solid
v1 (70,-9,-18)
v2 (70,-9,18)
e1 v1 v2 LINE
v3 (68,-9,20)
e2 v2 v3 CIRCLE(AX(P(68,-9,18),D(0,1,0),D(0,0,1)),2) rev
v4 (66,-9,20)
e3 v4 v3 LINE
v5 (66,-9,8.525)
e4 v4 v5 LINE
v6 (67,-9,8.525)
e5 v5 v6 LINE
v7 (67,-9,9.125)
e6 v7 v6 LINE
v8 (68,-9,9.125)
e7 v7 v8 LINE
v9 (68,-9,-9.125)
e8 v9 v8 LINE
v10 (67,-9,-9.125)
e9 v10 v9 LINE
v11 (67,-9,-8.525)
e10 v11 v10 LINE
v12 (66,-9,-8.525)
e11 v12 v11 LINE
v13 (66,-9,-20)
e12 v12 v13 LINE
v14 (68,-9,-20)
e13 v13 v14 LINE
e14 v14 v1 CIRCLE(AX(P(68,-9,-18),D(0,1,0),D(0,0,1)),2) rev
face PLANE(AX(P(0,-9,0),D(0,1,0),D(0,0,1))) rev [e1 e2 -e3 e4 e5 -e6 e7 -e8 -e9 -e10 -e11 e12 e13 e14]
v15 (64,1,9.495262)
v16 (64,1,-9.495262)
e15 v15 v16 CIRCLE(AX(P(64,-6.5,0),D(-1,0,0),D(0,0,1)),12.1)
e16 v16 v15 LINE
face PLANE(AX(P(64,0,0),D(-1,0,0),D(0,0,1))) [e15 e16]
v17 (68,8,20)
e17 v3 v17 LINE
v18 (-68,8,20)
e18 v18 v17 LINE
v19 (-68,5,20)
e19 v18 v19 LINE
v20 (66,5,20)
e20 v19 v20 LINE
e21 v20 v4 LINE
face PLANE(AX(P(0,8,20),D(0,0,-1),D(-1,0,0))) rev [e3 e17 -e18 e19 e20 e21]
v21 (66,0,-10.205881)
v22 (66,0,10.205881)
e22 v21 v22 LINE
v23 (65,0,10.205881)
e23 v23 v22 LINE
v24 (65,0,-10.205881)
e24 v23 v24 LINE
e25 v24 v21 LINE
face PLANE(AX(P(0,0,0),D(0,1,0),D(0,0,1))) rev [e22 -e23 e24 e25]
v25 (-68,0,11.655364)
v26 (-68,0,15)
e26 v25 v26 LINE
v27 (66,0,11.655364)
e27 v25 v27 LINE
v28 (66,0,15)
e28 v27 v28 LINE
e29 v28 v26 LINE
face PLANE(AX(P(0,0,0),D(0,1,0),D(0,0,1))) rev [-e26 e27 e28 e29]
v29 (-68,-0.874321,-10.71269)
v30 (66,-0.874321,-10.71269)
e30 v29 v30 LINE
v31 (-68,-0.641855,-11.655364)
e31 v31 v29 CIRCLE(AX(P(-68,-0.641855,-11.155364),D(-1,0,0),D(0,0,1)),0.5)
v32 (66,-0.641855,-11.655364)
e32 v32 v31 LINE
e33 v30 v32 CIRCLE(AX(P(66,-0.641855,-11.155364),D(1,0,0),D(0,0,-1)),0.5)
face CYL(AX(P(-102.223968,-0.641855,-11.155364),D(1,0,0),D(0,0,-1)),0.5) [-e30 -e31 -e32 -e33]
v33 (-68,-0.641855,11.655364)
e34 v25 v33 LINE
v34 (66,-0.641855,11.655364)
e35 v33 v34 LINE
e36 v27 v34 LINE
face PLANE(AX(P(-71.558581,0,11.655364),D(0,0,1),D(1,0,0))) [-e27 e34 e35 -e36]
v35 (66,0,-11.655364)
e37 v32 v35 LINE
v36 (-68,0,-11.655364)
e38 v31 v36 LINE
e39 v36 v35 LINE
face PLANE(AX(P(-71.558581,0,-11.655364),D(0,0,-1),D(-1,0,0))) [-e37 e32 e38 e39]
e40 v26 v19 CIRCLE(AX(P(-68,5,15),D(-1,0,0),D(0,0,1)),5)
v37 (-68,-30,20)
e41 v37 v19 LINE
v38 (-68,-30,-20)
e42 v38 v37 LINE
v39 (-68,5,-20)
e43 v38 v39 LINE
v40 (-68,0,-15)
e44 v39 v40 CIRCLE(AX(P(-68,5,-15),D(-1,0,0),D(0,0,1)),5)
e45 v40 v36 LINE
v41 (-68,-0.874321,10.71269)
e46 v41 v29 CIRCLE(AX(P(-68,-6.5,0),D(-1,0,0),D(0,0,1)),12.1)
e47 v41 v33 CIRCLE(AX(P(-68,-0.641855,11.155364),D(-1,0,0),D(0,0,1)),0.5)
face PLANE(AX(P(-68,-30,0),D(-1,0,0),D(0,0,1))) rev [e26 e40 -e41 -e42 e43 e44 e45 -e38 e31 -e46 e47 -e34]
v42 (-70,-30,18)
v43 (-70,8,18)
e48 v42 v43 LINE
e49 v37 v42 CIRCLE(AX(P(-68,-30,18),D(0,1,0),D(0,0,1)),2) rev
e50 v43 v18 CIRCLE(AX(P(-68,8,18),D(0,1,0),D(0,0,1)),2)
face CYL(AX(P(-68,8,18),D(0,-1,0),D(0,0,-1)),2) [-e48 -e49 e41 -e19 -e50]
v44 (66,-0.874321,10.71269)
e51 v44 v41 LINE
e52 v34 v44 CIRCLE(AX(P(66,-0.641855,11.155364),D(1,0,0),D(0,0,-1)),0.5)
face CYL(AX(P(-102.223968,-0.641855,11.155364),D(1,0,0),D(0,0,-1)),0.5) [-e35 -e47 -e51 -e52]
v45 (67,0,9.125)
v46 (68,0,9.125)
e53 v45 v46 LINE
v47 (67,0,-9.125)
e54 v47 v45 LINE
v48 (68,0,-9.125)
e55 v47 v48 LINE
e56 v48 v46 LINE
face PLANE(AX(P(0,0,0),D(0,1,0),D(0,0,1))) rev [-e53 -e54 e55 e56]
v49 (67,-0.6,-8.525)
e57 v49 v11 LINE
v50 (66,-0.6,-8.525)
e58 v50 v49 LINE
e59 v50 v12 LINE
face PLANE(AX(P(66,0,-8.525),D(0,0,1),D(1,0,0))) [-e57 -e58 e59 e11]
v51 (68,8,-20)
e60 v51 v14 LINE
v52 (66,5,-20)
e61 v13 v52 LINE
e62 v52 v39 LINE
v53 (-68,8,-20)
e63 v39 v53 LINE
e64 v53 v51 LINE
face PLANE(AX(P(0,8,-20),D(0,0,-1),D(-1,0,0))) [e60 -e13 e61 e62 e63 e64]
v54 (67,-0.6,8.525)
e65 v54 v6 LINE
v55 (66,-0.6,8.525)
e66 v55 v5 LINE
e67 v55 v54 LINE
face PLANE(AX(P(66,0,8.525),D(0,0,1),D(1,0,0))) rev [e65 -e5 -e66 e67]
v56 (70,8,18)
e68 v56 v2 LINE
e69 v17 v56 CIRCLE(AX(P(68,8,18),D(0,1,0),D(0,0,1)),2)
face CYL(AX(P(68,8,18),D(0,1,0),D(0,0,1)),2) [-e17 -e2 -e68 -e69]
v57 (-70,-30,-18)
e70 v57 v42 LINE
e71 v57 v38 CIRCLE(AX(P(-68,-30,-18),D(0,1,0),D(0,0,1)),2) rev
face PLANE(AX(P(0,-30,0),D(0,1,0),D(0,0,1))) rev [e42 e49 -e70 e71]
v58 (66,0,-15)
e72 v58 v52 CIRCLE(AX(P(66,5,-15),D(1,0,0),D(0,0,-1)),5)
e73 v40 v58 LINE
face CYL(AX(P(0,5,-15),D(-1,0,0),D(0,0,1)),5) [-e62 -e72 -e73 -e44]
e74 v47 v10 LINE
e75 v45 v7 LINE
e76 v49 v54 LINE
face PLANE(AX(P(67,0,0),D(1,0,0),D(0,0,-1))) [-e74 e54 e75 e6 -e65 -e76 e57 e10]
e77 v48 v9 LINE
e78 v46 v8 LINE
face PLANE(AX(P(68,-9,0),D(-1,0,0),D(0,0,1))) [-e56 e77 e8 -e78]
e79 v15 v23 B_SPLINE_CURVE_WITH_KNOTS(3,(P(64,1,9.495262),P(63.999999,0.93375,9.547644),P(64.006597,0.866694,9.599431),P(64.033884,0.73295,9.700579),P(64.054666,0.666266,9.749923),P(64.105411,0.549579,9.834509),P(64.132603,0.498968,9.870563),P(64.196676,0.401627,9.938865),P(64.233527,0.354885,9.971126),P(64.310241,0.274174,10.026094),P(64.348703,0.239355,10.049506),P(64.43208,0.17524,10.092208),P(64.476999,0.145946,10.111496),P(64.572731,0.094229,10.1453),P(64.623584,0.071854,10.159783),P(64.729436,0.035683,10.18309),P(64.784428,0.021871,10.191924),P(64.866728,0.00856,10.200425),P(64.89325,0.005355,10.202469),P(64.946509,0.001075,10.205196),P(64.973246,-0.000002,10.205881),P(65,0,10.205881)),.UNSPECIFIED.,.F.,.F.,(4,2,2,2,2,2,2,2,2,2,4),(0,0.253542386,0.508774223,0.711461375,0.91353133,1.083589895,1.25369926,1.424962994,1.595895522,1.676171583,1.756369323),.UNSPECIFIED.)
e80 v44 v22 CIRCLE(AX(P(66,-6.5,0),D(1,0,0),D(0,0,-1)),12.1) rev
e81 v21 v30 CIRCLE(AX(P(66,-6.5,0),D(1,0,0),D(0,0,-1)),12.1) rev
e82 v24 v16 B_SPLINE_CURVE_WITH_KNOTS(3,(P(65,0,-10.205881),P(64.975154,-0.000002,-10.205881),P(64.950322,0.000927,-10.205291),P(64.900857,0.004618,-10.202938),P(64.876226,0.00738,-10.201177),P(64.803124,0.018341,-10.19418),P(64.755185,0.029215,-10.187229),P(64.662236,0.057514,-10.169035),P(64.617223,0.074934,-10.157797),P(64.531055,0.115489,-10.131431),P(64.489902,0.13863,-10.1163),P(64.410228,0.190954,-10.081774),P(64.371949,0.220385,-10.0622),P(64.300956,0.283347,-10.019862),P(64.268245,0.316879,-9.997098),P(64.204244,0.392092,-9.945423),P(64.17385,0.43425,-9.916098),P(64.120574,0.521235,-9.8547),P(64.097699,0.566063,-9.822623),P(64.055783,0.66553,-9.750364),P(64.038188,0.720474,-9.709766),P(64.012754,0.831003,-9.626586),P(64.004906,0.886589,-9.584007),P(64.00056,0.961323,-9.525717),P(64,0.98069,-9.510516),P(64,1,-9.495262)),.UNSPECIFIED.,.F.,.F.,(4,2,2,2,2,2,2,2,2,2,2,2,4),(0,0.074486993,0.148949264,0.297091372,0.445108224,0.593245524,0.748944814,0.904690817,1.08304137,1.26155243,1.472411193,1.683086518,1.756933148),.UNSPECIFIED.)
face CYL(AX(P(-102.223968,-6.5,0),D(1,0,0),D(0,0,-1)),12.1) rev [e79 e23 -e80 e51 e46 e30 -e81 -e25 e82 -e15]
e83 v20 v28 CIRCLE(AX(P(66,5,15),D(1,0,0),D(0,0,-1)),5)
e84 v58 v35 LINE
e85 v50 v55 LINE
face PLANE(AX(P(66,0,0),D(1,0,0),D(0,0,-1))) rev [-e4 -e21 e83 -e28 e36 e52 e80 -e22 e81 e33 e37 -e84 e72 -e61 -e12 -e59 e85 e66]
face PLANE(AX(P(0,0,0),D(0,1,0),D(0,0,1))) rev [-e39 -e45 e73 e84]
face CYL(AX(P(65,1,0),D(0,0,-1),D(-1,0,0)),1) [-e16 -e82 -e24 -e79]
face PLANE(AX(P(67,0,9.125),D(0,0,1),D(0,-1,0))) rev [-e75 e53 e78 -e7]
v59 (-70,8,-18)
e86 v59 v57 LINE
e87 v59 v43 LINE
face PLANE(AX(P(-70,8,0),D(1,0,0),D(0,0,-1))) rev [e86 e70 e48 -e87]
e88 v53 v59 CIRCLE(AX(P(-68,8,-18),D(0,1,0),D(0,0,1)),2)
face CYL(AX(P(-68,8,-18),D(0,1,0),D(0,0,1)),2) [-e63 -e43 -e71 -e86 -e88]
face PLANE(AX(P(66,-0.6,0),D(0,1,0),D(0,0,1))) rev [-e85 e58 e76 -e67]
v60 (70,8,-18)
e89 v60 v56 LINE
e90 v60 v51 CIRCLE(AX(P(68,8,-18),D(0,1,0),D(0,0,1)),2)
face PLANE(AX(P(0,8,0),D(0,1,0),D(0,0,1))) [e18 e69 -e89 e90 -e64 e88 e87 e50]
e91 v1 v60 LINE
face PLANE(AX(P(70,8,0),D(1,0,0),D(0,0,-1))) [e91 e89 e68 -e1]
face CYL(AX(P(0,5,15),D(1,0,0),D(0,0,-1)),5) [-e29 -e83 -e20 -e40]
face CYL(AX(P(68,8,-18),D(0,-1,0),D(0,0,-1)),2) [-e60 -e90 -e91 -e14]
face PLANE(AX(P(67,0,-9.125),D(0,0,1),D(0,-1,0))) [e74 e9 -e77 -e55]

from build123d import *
from build123d.topology import SkipClean

# Parameters (mm, degrees)
SKETCH1_W           = 136
SKETCH1_H           = 40
SKETCH1_W_2         = 2
BOSS_EXTRUDE1_DEPTH = 8
SKETCH1_3_W         = 2
SKETCH1_3_H         = 40
BOSS_EXTRUDE2_DEPTH = 9
SKETCH2_W           = 10.875
SKETCH2_H           = 9
BOSS_EXTRUDE3_DEPTH = 1
BOSS_EXTRUDE4_START = 1
SKETCH2_3_W         = 10.875
SKETCH2_3_H         = 9
SKETCH2_3_W_2       = 17.05
SKETCH2_3_H_2       = 0.6
BOSS_EXTRUDE4_DEPTH = 1
SKETCH1_4_W         = 2
SKETCH1_4_H         = 40
BOSS_EXTRUDE5_DEPTH = 30
SKETCH3_R           = 12.1
CUT_EXTRUDE1_DEPTH  = 132
FILLET1_R           = 5
FILLET2_START       = -31
FILLET2_DEPTH       = 40
BOSS_EXTRUDE6_START = -2
BOSS_EXTRUDE6_DEPTH = 134
FILLET3_R           = 0.5
FILLET5_R           = 1


with BuildPart() as part:
    # Sketch1 → Boss-Extrude1 (new body)
    with BuildSketch(Plane(origin=(0, 0, 0), x_dir=(1, 0, 0), z_dir=(0, 1, 0))):
        Rectangle(SKETCH1_W, SKETCH1_H)
        with Locations((69, 0)):
            Rectangle(SKETCH1_W_2, SKETCH1_H)
        with Locations((-69, 0)):
            Rectangle(SKETCH1_W_2, SKETCH1_H)
    extrude(amount=BOSS_EXTRUDE1_DEPTH)

    # Sketch1<3> → Boss-Extrude2 (add)
    with BuildSketch(Plane(origin=(0, 0, 0), x_dir=(1, 0, 0), z_dir=(0, 1, 0))):
        with Locations((69, 0)):
            Rectangle(SKETCH1_3_W, SKETCH1_3_H)
    extrude(amount=-BOSS_EXTRUDE2_DEPTH)

    # Sketch2 → Boss-Extrude3 (add)
    with BuildSketch(Plane.ZY.offset(-68)):
        with Locations((14.5625, -4.5)):
            Rectangle(SKETCH2_W, SKETCH2_H)
        with Locations((-14.5625, -4.5)):
            Rectangle(SKETCH2_W, SKETCH2_H)
    extrude(amount=BOSS_EXTRUDE3_DEPTH)

    # Sketch2<3> → Boss-Extrude4 (add)
    with BuildSketch(Plane.ZY.offset(-68).offset(BOSS_EXTRUDE4_START)):
        Polygon((9.125, -9), (9.125, 0), (8.525, 0), (8.525, -0.6), (8.525, -9), align=None)
        with Locations((14.5625, -4.5)):
            Rectangle(SKETCH2_3_W, SKETCH2_3_H)
        with Locations((0, -0.3)):
            Rectangle(SKETCH2_3_W_2, SKETCH2_3_H_2)
        Polygon((-8.525, -0.6), (-8.525, 0), (-9.125, 0), (-9.125, -9), (-8.525, -9), align=None)
        with Locations((-14.5625, -4.5)):
            Rectangle(SKETCH2_3_W, SKETCH2_3_H)
    extrude(amount=BOSS_EXTRUDE4_DEPTH)

    # Sketch1<4> → Boss-Extrude5 (add)
    with BuildSketch(Plane(origin=(0, 0, 0), x_dir=(1, 0, 0), z_dir=(0, 1, 0))):
        with Locations((-69, 0)):
            Rectangle(SKETCH1_4_W, SKETCH1_4_H)
    extrude(amount=-BOSS_EXTRUDE5_DEPTH)

    # Sketch3 → Cut-Extrude1 (cut)
    with BuildSketch(Plane.ZY.offset(-64)):
        with Locations((0, -6.5)):
            Circle(SKETCH3_R)
    extrude(amount=CUT_EXTRUDE1_DEPTH, mode=Mode.SUBTRACT)

    # Fillet1
    fillet1_edges = [part.edges().sort_by_distance(p)[0] for p in [
        (-1, 0, -20),
        (-1, 0, 20),
    ]]
    fillet(fillet1_edges, radius=FILLET1_R)

    # Fillet2: read off the stored shape, not the designer's step
    # Fillet2 outline → Fillet2 (cut)
    with BuildSketch(Plane(origin=(0, 0, 0), x_dir=(1, 0, 0), z_dir=(0, 1, 0)).offset(FILLET2_START)):
        with BuildLine():
            Line((-70, -20), (-68, -20))
            ThreePointArc((-68, -20), (-69.414213562, -19.414213562), (-70, -18))
            Line((-70, -18), (-70, -20))
        make_face()
        with BuildLine():
            ThreePointArc((70, -18), (69.414213562, -19.414213562), (68, -20))
            Line((68, -20), (70, -20))
            Line((70, -20), (70, -18))
        make_face()
        with BuildLine():
            Line((-70, 20), (-70, 18))
            ThreePointArc((-70, 18), (-69.414213562, 19.414213562), (-68, 20))
            Line((-68, 20), (-70, 20))
        make_face()
        with BuildLine():
            ThreePointArc((68, 20), (69.414213562, 19.414213562), (70, 18))
            Line((70, 18), (70, 20))
            Line((70, 20), (68, 20))
        make_face()
    extrude(amount=FILLET2_DEPTH, mode=Mode.SUBTRACT)

    # Sketch3<3> → Boss-Extrude6 (add)
    with SkipClean():  # the faces are left unmerged after this step: merging them gives an invalid solid
        with BuildSketch(Plane.ZY.offset(-64).offset(BOSS_EXTRUDE6_START)):
            with BuildLine():
                Line((-11.655363572, 0), (-11.655363572, -3.25))
                ThreePointArc((-11.655363572, -3.25), (-11.050752229, -1.571422601), (-10.205880658, 0))
                Line((-10.205880658, 0), (-11.655363572, 0))
            make_face()
            with BuildLine():
                ThreePointArc((10.205880658, 0), (11.050752229, -1.571422601), (11.655363572, -3.25))
                Line((11.655363572, -3.25), (11.655363572, 0))
                Line((11.655363572, 0), (10.205880658, 0))
            make_face()
        extrude(amount=BOSS_EXTRUDE6_DEPTH)

    # Fillet3
    fillet3_edges = [part.edges().sort_by_distance(p)[0] for p in [
        (-1, -3.25, -11.655363572),
        (-1, -3.25, 11.655363572),
    ]]
    fillet(fillet3_edges, radius=FILLET3_R)

    # Fillet5
    # the kernel refuses this fillet: 1 mm, written as the material it takes off along each edge
    with BuildSketch(Plane(origin=(64, 0, -12.705880658), x_dir=(1, 0, 0), z_dir=(0, 0, 1))) as fillet5_piece_1_section:
        with BuildLine():
            CenterArc((FILLET5_R, FILLET5_R), FILLET5_R, 180, 90)
            Line((0, FILLET5_R), (0, 0))
            Line((0, 0), (FILLET5_R, 0))
        make_face()
    fillet5_piece_1 = extrude(amount=25.411761315, mode=Mode.PRIVATE)
    fillet5_piece_1 = fillet5_piece_1 & Plane(origin=(64, -6.5, 0), x_dir=(0, 0.5371900826446553, 0.8434612113833264), z_dir=(1, 0, 0)) * Cylinder(12.1, 55, mode=Mode.PRIVATE)
    add(fillet5_piece_1, mode=Mode.SUBTRACT)


solid = part.part
